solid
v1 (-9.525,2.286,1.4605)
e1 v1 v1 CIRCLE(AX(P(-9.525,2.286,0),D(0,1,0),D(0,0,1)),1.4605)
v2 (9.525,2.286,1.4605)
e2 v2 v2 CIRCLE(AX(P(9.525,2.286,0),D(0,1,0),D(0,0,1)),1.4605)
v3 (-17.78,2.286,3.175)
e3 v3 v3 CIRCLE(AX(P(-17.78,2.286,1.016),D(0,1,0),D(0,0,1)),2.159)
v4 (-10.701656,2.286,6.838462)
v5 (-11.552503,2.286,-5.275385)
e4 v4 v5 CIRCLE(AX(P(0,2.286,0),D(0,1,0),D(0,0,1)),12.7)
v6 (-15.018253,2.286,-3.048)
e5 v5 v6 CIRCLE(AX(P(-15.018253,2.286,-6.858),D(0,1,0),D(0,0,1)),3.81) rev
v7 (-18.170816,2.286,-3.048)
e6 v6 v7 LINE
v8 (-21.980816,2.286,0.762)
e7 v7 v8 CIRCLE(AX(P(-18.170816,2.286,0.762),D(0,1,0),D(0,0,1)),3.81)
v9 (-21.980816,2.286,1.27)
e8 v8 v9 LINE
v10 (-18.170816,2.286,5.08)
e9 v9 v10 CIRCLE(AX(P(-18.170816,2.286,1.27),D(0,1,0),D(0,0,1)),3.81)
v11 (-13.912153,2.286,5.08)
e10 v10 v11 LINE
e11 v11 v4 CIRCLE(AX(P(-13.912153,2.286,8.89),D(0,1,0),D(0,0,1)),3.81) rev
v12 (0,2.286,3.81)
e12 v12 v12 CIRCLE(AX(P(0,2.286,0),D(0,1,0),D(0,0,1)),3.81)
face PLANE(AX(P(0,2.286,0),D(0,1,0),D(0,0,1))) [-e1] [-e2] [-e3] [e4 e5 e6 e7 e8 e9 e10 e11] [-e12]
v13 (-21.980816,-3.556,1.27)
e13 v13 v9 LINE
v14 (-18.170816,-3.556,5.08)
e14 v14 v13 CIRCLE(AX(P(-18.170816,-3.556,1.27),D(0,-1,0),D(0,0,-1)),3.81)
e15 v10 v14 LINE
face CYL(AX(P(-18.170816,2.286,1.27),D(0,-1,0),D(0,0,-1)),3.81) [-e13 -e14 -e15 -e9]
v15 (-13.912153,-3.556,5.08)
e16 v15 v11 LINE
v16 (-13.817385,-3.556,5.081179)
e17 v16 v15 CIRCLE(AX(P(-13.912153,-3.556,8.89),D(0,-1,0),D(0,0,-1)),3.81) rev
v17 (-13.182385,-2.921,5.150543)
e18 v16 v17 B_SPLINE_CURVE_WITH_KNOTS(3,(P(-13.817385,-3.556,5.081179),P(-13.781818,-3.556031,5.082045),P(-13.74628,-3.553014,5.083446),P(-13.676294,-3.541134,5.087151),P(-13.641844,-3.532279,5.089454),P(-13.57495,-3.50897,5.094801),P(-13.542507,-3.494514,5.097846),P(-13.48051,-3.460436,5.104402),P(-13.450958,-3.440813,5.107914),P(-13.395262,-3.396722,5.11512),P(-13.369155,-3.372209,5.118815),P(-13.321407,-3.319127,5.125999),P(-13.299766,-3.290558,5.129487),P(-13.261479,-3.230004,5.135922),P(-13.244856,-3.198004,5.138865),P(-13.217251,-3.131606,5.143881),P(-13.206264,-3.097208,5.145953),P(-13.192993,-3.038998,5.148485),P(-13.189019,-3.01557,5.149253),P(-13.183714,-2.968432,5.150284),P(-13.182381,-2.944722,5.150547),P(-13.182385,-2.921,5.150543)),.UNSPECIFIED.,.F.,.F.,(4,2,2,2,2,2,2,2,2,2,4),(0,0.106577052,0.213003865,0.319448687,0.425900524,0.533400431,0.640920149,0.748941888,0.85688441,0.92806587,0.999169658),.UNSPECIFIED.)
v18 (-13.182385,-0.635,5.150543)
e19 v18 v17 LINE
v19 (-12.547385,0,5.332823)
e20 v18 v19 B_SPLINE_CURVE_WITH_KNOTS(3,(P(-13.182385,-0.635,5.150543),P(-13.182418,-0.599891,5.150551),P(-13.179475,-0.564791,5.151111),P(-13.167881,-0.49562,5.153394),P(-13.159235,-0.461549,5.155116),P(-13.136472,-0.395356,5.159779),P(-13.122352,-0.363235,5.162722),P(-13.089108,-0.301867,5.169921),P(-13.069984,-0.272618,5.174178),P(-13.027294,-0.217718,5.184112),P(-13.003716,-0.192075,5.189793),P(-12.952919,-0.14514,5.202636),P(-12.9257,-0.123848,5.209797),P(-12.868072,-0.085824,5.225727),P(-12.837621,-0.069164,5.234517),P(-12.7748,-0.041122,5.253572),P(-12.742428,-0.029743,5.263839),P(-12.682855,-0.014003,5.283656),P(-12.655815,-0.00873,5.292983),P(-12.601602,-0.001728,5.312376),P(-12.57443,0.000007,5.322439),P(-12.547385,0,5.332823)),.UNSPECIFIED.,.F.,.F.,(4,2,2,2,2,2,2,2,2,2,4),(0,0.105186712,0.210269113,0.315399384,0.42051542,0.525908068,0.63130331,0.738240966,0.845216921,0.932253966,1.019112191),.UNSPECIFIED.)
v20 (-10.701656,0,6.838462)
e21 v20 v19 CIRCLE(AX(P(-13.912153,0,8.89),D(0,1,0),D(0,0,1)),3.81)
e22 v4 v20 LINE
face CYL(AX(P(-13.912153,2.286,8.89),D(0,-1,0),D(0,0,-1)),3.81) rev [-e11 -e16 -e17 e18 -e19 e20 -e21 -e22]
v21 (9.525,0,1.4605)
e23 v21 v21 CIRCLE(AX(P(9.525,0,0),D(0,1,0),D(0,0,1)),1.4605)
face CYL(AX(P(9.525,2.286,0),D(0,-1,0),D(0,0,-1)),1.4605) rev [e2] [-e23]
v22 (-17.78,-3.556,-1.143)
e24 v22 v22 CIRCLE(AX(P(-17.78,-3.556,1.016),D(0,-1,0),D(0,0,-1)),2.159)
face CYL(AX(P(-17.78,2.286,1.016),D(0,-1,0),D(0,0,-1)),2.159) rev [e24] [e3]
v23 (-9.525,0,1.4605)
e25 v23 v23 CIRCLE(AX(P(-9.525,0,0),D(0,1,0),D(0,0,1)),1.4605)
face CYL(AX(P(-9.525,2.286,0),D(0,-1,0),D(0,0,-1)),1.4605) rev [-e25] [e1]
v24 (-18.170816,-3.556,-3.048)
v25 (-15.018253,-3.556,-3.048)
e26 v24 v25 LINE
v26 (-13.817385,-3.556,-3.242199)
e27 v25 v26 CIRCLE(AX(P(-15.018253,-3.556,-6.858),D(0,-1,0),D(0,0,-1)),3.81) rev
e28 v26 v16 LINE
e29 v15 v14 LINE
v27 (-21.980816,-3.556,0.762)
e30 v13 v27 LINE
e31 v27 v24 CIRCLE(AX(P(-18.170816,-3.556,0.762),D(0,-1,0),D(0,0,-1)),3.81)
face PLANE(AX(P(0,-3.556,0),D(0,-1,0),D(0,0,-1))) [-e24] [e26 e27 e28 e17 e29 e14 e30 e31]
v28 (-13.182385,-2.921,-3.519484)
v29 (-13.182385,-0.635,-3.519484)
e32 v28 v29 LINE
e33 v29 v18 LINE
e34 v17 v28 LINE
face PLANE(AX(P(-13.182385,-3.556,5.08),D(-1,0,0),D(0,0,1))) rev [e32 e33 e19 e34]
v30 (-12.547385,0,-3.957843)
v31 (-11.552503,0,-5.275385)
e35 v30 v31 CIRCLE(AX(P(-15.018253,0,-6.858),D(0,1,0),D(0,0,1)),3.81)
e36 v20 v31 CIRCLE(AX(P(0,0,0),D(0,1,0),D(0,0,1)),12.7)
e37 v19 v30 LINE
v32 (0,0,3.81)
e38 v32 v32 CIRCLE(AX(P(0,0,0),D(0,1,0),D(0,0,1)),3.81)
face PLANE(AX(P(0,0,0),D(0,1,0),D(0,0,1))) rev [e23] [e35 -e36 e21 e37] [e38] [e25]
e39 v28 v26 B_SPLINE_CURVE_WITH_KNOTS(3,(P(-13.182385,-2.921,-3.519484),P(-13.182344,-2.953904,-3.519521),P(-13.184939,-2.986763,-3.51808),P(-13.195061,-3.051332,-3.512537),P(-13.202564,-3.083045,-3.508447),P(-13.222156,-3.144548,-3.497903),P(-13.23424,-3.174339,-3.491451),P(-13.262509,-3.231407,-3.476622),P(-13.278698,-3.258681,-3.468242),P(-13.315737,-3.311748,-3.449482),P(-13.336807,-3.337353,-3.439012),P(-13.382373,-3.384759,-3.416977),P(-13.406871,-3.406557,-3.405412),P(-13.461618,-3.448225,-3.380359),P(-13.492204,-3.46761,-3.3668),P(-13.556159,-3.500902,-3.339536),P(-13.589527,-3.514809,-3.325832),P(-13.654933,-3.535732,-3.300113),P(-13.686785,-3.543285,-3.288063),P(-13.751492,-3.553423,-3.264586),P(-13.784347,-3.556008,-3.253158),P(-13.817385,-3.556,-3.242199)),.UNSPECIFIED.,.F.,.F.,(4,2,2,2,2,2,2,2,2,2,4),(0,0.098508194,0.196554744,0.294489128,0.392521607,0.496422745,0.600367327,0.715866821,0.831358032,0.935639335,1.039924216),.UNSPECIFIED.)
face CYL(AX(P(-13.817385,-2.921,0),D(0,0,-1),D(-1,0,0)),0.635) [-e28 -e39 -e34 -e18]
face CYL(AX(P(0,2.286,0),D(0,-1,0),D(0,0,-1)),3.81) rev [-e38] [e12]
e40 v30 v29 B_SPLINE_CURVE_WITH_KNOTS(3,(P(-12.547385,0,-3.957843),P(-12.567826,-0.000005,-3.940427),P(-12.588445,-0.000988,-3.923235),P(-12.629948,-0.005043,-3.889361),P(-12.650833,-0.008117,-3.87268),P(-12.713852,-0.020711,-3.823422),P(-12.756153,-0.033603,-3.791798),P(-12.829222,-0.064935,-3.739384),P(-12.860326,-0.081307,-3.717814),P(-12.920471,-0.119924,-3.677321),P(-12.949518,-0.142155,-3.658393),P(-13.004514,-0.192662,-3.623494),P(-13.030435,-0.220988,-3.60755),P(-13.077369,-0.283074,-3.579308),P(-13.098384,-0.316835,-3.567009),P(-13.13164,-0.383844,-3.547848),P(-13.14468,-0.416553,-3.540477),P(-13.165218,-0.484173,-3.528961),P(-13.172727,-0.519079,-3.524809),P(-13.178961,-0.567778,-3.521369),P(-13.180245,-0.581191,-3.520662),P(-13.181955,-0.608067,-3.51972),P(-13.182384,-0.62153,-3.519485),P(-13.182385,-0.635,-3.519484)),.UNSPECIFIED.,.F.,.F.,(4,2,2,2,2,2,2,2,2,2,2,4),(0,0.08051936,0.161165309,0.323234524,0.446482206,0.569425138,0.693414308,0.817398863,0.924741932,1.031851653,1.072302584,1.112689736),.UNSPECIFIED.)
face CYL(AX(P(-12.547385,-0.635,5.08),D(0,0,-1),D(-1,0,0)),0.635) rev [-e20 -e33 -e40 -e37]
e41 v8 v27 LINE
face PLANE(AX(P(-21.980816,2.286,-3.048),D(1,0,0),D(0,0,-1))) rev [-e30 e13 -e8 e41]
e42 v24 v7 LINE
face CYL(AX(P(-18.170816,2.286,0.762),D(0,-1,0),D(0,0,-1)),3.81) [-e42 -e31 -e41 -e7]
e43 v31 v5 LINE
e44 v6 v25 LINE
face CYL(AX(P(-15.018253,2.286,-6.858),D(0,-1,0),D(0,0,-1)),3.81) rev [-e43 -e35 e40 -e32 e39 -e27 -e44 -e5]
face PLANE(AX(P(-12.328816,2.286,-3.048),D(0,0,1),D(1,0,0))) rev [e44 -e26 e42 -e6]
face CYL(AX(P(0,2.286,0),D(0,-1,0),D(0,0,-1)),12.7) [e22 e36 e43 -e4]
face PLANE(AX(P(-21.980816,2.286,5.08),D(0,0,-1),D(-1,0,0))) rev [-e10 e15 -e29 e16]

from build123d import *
from build123d.topology import SkipClean

# Parameters (mm, degrees)
SKETCH1_R           = 3.81
SKETCH1_R_2         = 1.4605
SKETCH1_R_3         = 2.159
BOSS_EXTRUDE1_DEPTH = 2.286
BOSS_EXTRUDE2_START = 3.556
SKETCH3_W           = 8.798430976
SKETCH3_H           = 8.128
SKETCH3_R           = 2.159
BOSS_EXTRUDE2_DEPTH = 3.556
FILLET1_R           = 3.81
FILLET2_R           = 3.81
FILLET3_R           = 0.635


with BuildPart() as part:
    # Sketch1 → Boss-Extrude1 (new body)
    with BuildSketch(Plane(origin=(0, 0, 0), x_dir=(1, 0, 0), z_dir=(0, 1, 0))):
        with BuildLine():
            Line((-12.328815677, 3.048), (-21.980815677, 3.048))
            Line((-21.980815677, 3.048), (-21.980815677, -5.08))
            Line((-21.980815677, -5.08), (-11.639742265, -5.08))
            ThreePointArc((-11.639742265, -5.08), (12.654605425, 1.072828757), (-12.328815677, 3.048))
        make_face()
        with Locations(Location((0, 0, 0), (0, 0, 270))):
            Circle(SKETCH1_R, mode=Mode.SUBTRACT)
        with Locations(Location((9.525, 0, 0), (0, 0, 270))):
            Circle(SKETCH1_R_2, mode=Mode.SUBTRACT)
        with Locations(Location((-9.525, 0, 0), (0, 0, 270))):
            Circle(SKETCH1_R_2, mode=Mode.SUBTRACT)
        with Locations(Location((-17.78, -1.016, 0), (0, 0, 270))):
            Circle(SKETCH1_R_3, mode=Mode.SUBTRACT)
    extrude(amount=BOSS_EXTRUDE1_DEPTH)

    # Sketch3 → Boss-Extrude2 (add)
    with SkipClean():  # the faces are left unmerged after this step: merging them gives an invalid solid
        with BuildSketch(Plane.XZ.offset(BOSS_EXTRUDE2_START)):
            with Locations((-17.581600189, 1.016)):
                Rectangle(SKETCH3_W, SKETCH3_H)
            with Locations(Location((-17.78, 1.016, 0), (0, 0, 270))):
                Circle(SKETCH3_R, mode=Mode.SUBTRACT)
        extrude(amount=-BOSS_EXTRUDE2_DEPTH)

    # Fillet1
    fillet1_edges = [part.edges().sort_by_distance(p)[0] for p in [
        (-21.980815677, -1.778, 5.08),
        (-21.980815677, -1.778, -3.048),
    ]]
    fillet(fillet1_edges, radius=FILLET1_R)

    # Fillet2
    # the kernel refuses this fillet: 3.81 mm, written as the material it adds along each edge
    with BuildSketch(Plane(origin=(-12.328815677, -6.723594375, -3.048), x_dir=(-1, 0, 0), z_dir=(0, 1, 0))) as fillet2_piece_1_section:
        with BuildLine():
            CenterArc((2.68943775, -3.81), FILLET2_R, 90, 65.456460121)
            ThreePointArc((-0.776313041, -2.227384615), (-0.336332546, -1.13175458), (0, 0))
            Line((0, 0), (2.68943775, 0))
        make_face()
    fillet2_piece_1 = extrude(amount=9.009594375, mode=Mode.PRIVATE)
    fillet2_piece_1 = split(fillet2_piece_1, bisect_by=Plane(origin=(-13.789984069, 0, -3.128673841), z_dir=(0, -1, 0)), keep=Keep.TOP, mode=Mode.PRIVATE)
    fillet2_piece_1 = split(fillet2_piece_1, bisect_by=Plane(origin=(-13.789984069, -3.556, -3.128673841), z_dir=(0, 1, 0)), keep=Keep.TOP, mode=Mode.PRIVATE)
    fillet2_piece_1 = split(fillet2_piece_1, bisect_by=Plane(origin=(-13.182384701, -1.778, -3.128673841), z_dir=(-1, 0, 0)), keep=Keep.TOP, mode=Mode.PRIVATE)
    add(fillet2_piece_1)
    with BuildSketch(Plane(origin=(-12.328815677, 0, -3.048), x_dir=(-1, 0, 0), z_dir=(0, 1, 0))) as fillet2_piece_2_section:
        with BuildLine():
            CenterArc((2.68943775, -3.81), FILLET2_R, 90, 65.456460121)
            ThreePointArc((-0.776313041, -2.227384615), (-0.336332546, -1.13175458), (0, 0))
            Line((0, 0), (2.68943775, 0))
        make_face()
    fillet2_piece_2 = extrude(amount=2.286, mode=Mode.PRIVATE)
    fillet2_piece_2 = split(fillet2_piece_2, bisect_by=Plane(origin=(-13.182384701, 1.143, -3.128673841), z_dir=(-1, 0, 0)), keep=Keep.TOP, mode=Mode.PRIVATE)
    add(fillet2_piece_2)
    with BuildSketch(Plane(origin=(-12.328815677, 0, -3.048), x_dir=(-1, 0, 0), z_dir=(0, 1, 0))) as fillet2_piece_3_section:
        with BuildLine():
            CenterArc((2.68943775, -3.81), FILLET2_R, 90, 65.456460121)
            ThreePointArc((-0.776313041, -2.227384615), (-0.336332546, -1.13175458), (0, 0))
            Line((0, 0), (2.68943775, 0))
        make_face()
    fillet2_piece_3 = extrude(amount=2.286, mode=Mode.PRIVATE)
    fillet2_piece_3 = split(fillet2_piece_3, bisect_by=Plane(origin=(-13.182384701, 1.143, -3.680280143), z_dir=(1, 0, 0)), keep=Keep.TOP, mode=Mode.PRIVATE)
    add(fillet2_piece_3)
    with BuildSketch(Plane(origin=(-11.639742265, -5.681026739, 5.08), x_dir=(0.47068197991323696, 0, 0.8823029376495101), z_dir=(0, 1, 0))) as fillet2_piece_4_section:
        with BuildLine():
            CenterArc((2.291991427, -3.798252976), FILLET2_R, 94.500395957, 57.421029607)
            Line((-1.069582765, -2.004954632), (0, 0))
            ThreePointArc((0, 0), (0.996518012, -0.039156748), (1.993036024, 0))
        make_face()
    fillet2_piece_4 = extrude(amount=7.967026739, mode=Mode.PRIVATE)
    fillet2_piece_4 = split(fillet2_piece_4, bisect_by=Plane(origin=(-13.504288869, 0, 5.055827312), z_dir=(0, -1, 0)), keep=Keep.TOP, mode=Mode.PRIVATE)
    fillet2_piece_4 = split(fillet2_piece_4, bisect_by=Plane(origin=(-13.504288869, -3.556, 5.055827312), z_dir=(0, 1, 0)), keep=Keep.TOP, mode=Mode.PRIVATE)
    fillet2_piece_4 = split(fillet2_piece_4, bisect_by=Plane(origin=(-13.182384701, -1.778, 5.055827312), z_dir=(-1, 0, 0)), keep=Keep.TOP, mode=Mode.PRIVATE)
    add(fillet2_piece_4)
    with BuildSketch(Plane(origin=(-11.639742265, 0, 5.08), x_dir=(0.47068197991323696, 0, 0.8823029376495101), z_dir=(0, 1, 0))) as fillet2_piece_5_section:
        with BuildLine():
            CenterArc((2.291991427, -3.798252976), FILLET2_R, 94.500395957, 57.421029607)
            Line((-1.069582765, -2.004954632), (0, 0))
            ThreePointArc((0, 0), (0.996518012, -0.039156748), (1.993036024, 0))
        make_face()
    fillet2_piece_5 = extrude(amount=2.286, mode=Mode.PRIVATE)
    fillet2_piece_5 = split(fillet2_piece_5, bisect_by=Plane(origin=(-13.182384701, 1.143, 5.488267474), z_dir=(1, 0, 0)), keep=Keep.TOP, mode=Mode.PRIVATE)
    add(fillet2_piece_5)
    with BuildSketch(Plane(origin=(-11.639742265, 0, 5.08), x_dir=(0.47068197991323696, 0, 0.8823029376495101), z_dir=(0, 1, 0))) as fillet2_piece_6_section:
        with BuildLine():
            CenterArc((2.291991427, -3.798252976), FILLET2_R, 94.500395957, 57.421029607)
            Line((-1.069582765, -2.004954632), (0, 0))
            ThreePointArc((0, 0), (0.996518012, -0.039156748), (1.993036024, 0))
        make_face()
    fillet2_piece_6 = extrude(amount=2.286, mode=Mode.PRIVATE)
    fillet2_piece_6 = split(fillet2_piece_6, bisect_by=Plane(origin=(-13.182384701, 1.143, 5.055827312), z_dir=(-1, 0, 0)), keep=Keep.TOP, mode=Mode.PRIVATE)
    add(fillet2_piece_6)

    # Fillet3
    fillet3_edges = [part.edges().sort_by_distance(p)[0] for p in [
        (-13.182384701, -3.556, 0.815529295),
        (-13.182384701, 0, 0.815529295),
    ]]
    fillet(fillet3_edges, radius=FILLET3_R)


solid = part.part
